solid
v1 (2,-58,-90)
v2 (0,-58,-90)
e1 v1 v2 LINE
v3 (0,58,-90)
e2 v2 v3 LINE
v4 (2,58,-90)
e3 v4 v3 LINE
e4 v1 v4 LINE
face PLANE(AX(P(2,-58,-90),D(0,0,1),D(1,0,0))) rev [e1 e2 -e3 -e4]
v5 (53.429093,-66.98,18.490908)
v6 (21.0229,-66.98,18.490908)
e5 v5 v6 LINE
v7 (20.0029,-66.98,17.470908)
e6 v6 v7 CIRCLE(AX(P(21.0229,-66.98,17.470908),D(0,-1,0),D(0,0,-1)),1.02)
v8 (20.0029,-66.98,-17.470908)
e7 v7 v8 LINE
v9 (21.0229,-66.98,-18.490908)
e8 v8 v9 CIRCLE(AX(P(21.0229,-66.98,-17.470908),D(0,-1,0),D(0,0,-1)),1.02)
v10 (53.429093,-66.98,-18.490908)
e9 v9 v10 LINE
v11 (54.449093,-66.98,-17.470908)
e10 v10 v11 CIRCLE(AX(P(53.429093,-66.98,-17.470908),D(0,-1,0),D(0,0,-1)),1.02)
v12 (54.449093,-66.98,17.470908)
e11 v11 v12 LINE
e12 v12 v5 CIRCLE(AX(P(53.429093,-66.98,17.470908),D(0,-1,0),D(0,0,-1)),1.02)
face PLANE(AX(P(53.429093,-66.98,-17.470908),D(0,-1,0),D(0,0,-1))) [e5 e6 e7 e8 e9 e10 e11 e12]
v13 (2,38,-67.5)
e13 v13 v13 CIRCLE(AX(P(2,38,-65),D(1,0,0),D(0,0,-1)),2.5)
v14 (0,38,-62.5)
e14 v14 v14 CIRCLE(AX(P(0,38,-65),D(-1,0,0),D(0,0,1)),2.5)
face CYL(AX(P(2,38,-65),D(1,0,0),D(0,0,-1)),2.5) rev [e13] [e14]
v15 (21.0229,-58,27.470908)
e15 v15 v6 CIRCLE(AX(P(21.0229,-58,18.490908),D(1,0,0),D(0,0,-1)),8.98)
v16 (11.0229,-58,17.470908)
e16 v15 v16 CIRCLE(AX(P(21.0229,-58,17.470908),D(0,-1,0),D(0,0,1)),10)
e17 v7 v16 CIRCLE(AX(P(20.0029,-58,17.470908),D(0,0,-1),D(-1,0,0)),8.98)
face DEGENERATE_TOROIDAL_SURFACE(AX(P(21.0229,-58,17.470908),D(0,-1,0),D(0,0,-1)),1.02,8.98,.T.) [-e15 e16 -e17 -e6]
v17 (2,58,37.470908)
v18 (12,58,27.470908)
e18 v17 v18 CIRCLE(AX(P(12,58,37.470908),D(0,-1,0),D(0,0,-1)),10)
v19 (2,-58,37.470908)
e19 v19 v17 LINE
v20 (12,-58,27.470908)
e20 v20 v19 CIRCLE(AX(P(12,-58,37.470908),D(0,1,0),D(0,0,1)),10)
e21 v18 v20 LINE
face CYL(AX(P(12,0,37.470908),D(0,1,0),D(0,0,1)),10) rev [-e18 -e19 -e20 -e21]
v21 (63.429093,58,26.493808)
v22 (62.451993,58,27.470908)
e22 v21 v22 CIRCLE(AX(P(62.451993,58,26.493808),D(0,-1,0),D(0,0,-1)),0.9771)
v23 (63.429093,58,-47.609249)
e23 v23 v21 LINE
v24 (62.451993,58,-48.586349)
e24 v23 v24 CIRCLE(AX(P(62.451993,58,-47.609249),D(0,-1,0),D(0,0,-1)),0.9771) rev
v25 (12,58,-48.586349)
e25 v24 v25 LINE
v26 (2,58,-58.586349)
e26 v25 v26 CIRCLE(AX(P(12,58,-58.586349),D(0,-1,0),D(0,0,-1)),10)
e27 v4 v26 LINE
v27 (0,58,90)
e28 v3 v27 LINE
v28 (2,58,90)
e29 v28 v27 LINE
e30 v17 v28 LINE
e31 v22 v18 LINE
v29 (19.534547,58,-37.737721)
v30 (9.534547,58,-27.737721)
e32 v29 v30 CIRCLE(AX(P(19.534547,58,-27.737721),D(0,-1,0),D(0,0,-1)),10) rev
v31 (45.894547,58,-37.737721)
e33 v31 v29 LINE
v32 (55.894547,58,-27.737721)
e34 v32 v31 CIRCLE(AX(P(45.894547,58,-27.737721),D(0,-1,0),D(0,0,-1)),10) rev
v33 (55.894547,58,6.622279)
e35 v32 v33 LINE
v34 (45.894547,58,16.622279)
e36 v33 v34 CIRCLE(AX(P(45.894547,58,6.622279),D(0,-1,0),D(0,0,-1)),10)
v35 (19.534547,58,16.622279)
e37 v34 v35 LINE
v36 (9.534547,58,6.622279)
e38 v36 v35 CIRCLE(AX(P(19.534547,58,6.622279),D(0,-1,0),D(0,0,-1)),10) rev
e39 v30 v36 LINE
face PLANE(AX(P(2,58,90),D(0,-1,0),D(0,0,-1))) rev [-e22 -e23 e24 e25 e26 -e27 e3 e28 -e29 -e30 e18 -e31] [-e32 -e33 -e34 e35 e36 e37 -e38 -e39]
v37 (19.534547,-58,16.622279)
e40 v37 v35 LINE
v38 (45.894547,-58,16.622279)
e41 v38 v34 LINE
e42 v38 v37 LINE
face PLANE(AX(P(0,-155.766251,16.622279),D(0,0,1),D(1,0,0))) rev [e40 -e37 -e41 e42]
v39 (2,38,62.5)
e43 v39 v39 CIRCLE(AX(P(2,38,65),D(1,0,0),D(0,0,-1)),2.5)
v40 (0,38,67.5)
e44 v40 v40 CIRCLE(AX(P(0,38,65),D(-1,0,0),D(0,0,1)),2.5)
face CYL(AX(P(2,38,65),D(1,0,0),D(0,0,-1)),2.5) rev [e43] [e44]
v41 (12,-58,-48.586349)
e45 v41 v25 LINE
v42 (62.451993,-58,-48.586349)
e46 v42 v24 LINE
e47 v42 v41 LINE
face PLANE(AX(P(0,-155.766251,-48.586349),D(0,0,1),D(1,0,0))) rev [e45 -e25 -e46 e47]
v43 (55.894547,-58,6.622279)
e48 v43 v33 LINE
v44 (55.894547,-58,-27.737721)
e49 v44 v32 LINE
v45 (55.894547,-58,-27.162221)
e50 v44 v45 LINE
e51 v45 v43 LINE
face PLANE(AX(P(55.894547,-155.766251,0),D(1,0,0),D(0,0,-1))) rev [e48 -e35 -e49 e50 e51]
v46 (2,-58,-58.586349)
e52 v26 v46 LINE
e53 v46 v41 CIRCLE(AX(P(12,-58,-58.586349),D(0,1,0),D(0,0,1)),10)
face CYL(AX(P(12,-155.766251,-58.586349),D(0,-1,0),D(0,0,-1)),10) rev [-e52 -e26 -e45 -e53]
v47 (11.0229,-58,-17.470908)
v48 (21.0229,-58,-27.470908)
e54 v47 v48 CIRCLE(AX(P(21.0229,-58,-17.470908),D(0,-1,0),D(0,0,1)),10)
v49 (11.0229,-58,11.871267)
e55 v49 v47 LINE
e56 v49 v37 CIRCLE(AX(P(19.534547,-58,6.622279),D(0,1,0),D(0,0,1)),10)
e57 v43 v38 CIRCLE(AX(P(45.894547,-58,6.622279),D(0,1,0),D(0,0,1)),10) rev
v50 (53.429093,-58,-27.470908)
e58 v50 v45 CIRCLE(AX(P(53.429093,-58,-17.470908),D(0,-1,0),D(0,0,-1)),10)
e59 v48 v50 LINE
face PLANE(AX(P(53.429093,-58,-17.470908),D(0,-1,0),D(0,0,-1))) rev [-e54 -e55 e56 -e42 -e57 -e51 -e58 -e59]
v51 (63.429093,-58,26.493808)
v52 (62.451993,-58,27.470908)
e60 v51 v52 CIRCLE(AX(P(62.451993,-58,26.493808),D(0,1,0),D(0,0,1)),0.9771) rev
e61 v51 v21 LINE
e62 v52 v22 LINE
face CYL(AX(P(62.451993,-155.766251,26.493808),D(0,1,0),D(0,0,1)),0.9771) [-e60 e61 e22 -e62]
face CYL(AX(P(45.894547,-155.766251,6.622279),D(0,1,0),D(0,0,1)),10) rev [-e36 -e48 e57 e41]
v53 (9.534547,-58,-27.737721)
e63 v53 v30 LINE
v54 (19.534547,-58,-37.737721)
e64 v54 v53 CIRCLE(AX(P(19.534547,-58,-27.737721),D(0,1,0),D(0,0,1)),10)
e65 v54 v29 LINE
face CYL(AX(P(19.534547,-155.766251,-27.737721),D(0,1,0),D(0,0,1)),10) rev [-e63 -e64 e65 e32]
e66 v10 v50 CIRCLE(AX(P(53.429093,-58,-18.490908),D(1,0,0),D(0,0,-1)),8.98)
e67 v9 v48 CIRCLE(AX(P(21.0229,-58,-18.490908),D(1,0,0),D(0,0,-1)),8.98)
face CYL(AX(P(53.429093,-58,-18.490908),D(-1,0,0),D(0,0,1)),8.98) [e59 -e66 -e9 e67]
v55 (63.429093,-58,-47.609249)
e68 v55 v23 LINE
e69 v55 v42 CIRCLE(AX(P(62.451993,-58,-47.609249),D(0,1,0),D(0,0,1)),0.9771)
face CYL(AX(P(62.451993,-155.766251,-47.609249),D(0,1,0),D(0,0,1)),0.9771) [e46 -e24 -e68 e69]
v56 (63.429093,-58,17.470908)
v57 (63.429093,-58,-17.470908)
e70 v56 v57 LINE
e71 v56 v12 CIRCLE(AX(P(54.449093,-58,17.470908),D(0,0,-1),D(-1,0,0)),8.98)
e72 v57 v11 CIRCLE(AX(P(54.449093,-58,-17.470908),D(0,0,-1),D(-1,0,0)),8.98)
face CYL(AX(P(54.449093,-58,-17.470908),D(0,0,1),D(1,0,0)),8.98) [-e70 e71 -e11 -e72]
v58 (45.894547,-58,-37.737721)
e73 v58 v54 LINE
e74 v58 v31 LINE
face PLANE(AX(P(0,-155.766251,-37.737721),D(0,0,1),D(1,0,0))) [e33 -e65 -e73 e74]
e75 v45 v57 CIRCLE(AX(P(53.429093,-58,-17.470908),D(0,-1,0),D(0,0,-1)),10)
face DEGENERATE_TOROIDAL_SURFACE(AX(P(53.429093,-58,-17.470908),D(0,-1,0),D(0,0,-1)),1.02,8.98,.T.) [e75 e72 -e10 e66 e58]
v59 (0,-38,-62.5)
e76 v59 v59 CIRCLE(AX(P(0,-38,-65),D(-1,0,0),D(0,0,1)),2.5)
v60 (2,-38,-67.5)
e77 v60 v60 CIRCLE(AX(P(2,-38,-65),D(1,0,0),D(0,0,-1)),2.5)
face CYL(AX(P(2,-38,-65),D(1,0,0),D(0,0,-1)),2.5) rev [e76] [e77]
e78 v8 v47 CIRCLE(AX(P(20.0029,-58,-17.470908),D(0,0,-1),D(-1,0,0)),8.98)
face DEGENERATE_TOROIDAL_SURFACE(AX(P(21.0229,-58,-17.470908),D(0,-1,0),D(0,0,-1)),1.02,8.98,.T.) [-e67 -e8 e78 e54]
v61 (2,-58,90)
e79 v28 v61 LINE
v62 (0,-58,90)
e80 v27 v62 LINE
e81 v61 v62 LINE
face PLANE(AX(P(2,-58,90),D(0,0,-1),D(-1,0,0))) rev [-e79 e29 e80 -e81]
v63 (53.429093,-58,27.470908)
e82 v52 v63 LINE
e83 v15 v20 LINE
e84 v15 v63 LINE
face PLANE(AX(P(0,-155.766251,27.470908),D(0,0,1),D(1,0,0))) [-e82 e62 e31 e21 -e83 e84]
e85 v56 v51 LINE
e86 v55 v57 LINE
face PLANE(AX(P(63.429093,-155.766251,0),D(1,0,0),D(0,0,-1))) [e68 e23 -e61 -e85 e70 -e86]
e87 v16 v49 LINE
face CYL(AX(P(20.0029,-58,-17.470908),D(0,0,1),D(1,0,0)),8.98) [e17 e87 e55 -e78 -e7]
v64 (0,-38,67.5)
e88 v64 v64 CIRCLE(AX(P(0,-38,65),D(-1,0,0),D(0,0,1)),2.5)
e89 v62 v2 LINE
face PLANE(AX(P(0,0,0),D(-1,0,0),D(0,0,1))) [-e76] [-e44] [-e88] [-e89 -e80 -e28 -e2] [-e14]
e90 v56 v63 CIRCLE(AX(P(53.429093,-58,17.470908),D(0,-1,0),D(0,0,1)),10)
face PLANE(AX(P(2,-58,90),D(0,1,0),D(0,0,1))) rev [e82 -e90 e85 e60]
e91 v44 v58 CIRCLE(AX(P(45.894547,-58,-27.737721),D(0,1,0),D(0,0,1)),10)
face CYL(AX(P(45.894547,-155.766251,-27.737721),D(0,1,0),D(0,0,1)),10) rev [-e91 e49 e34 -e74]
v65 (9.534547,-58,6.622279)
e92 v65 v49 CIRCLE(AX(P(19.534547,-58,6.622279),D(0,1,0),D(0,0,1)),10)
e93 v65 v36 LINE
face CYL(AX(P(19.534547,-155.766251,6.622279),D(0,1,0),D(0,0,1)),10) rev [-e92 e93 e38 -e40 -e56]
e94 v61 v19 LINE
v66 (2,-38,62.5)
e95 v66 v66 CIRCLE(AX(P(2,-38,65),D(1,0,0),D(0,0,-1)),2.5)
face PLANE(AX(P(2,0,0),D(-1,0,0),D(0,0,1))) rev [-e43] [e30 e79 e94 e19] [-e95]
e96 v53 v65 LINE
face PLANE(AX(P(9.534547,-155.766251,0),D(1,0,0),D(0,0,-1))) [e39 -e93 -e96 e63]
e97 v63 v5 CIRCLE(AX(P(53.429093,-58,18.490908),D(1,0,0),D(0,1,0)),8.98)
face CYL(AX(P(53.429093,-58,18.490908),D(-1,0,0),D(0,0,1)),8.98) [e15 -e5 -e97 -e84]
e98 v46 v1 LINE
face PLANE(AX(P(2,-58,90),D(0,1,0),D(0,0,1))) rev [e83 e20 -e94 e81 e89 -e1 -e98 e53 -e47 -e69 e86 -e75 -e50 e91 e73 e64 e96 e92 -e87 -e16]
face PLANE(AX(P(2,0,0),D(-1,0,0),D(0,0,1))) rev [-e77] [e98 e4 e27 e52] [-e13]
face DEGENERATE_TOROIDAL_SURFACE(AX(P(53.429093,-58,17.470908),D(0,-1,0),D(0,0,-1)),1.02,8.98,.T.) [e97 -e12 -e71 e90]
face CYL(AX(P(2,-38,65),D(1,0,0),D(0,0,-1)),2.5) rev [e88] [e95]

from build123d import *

# Parameters (mm, degrees)
SKETCH1_W                       = 180
SKETCH1_H                       = 116
BOSS_EXTRUDE1_DEPTH             = 2
BOSS_EXTRUDE6_REACH             = 109.089
BOSS_EXTRUDE6_DIRECTION_2_REACH = 109.089
FILLET5_R                       = 10
BOSS_EXTRUDE8_DEPTH             = 8.98
FILLET7_R                       = 8.98
M6X1_0_TAPPED_HOLE1_D           = 5


with BuildPart() as part:
    # Sketch1 → Boss-Extrude1 (new body)
    with BuildSketch(Plane(origin=(0, 0, 0), x_dir=(0, 0, -1), z_dir=(1, 0, 0))):
        Rectangle(SKETCH1_W, SKETCH1_H)
    extrude(amount=BOSS_EXTRUDE1_DEPTH)

    # Boss-Extrude6: up to this face of the body (flat: up to its plane)
    boss_extrude6_end = Plane(part.part.faces().sort_by_distance((1, -58, 0))[0])
    # Sketch9 → Boss-Extrude6 (add, up to the picked face)
    with BuildSketch(Plane(origin=(0, 0, 0), x_dir=(1, 0, 0), z_dir=(0, 1, 0)), mode=Mode.PRIVATE) as boss_extrude6_sk1:
        with BuildLine():
            Line((2, -27.470907931), (20, -27.470907931))
            Line((20, -27.470907931), (62.451993428, -27.470907931))
            ThreePointArc((62.451993428, -27.470907931), (63.142907445, -27.184721975), (63.429093401, -26.493807958))
            Line((63.429093401, -26.493807958), (63.429093401, 47.609249241))
            ThreePointArc((63.429093401, 47.609249241), (63.142907445, 48.300163258), (62.451993428, 48.586349214))
            Line((62.451993428, 48.586349214), (20, 48.586349214))
            Line((20, 48.586349214), (2, 48.586349214))
            Line((2, 48.586349214), (2, 27.673016612))
            Line((2, 27.673016612), (2, -27.470907931))
        make_face()
        with BuildLine():
            Line((45.894546701, -16.622279359), (19.534546701, -16.622279359))
            ThreePointArc((19.534546701, -16.622279359), (12.463478889, -13.693347171), (9.534546701, -6.622279359))
            Line((9.534546701, -6.622279359), (9.534546701, 27.737720641))
            ThreePointArc((9.534546701, 27.737720641), (12.463478889, 34.808788453), (19.534546701, 37.737720641))
            Line((19.534546701, 37.737720641), (45.894546701, 37.737720641))
            ThreePointArc((45.894546701, 37.737720641), (52.965614513, 34.808788453), (55.894546701, 27.737720641))
            Line((55.894546701, 27.737720641), (55.894546701, -6.622279359))
            ThreePointArc((55.894546701, -6.622279359), (52.965614513, -13.693347171), (45.894546701, -16.622279359))
        make_face(mode=Mode.SUBTRACT)
    boss_extrude6_tool1 = split(extrude(boss_extrude6_sk1.sketch, amount=-BOSS_EXTRUDE6_REACH, mode=Mode.PRIVATE), bisect_by=boss_extrude6_end, keep=Keep.BOTH, mode=Mode.PRIVATE)
    add(boss_extrude6_tool1.solids().sort_by(Axis((11, 0, 26.493245), (0, -1, 0)))[0])

    # Boss-Extrude6 direction 2: up to this face of the body (flat: up to its plane)
    boss_extrude6_direction_2_end = Plane(part.part.faces().sort_by_distance((1, 58, 0))[0])
    # Sketch9 → Boss-Extrude6 direction 2 (add, up to the picked face)
    with BuildSketch(Plane(origin=(0, 0, 0), x_dir=(1, 0, 0), z_dir=(0, 1, 0)), mode=Mode.PRIVATE) as boss_extrude6_direction_2_sk1:
        with BuildLine():
            Line((2, -27.470907931), (20, -27.470907931))
            Line((20, -27.470907931), (62.451993428, -27.470907931))
            ThreePointArc((62.451993428, -27.470907931), (63.142907445, -27.184721975), (63.429093401, -26.493807958))
            Line((63.429093401, -26.493807958), (63.429093401, 47.609249241))
            ThreePointArc((63.429093401, 47.609249241), (63.142907445, 48.300163258), (62.451993428, 48.586349214))
            Line((62.451993428, 48.586349214), (20, 48.586349214))
            Line((20, 48.586349214), (2, 48.586349214))
            Line((2, 48.586349214), (2, 27.673016612))
            Line((2, 27.673016612), (2, -27.470907931))
        make_face()
        with BuildLine():
            Line((45.894546701, -16.622279359), (19.534546701, -16.622279359))
            ThreePointArc((19.534546701, -16.622279359), (12.463478889, -13.693347171), (9.534546701, -6.622279359))
            Line((9.534546701, -6.622279359), (9.534546701, 27.737720641))
            ThreePointArc((9.534546701, 27.737720641), (12.463478889, 34.808788453), (19.534546701, 37.737720641))
            Line((19.534546701, 37.737720641), (45.894546701, 37.737720641))
            ThreePointArc((45.894546701, 37.737720641), (52.965614513, 34.808788453), (55.894546701, 27.737720641))
            Line((55.894546701, 27.737720641), (55.894546701, -6.622279359))
            ThreePointArc((55.894546701, -6.622279359), (52.965614513, -13.693347171), (45.894546701, -16.622279359))
        make_face(mode=Mode.SUBTRACT)
    boss_extrude6_direction_2_tool1 = split(extrude(boss_extrude6_direction_2_sk1.sketch, amount=BOSS_EXTRUDE6_DIRECTION_2_REACH, mode=Mode.PRIVATE), bisect_by=boss_extrude6_direction_2_end, keep=Keep.BOTH, mode=Mode.PRIVATE)
    add(boss_extrude6_direction_2_tool1.solids().sort_by(Axis((11, 0, 26.493245), (0, 1, 0)))[0])

    # Fillet5
    fillet5_edges = [part.edges().sort_by_distance(p)[0] for p in [
        (2, 0, 27.470907931),
        (2, 0, -48.586349214),
    ]]
    fillet(fillet5_edges, radius=FILLET5_R)

    # Sketch11 → Boss-Extrude8 (add)
    with BuildSketch(Plane.XZ.offset(58)):
        with BuildLine():
            Line((21.022900027, -27.470907931), (53.429093401, -27.470907931))
            ThreePointArc((53.429093401, -27.470907931), (60.500161213, -24.541975743), (63.429093401, -17.470907931))
            Line((63.429093401, -17.470907931), (63.429093401, 17.470907931))
            ThreePointArc((63.429093401, 17.470907931), (60.500161213, 24.541975743), (53.429093401, 27.470907931))
            Line((53.429093401, 27.470907931), (21.022900027, 27.470907931))
            ThreePointArc((21.022900027, 27.470907931), (13.951832215, 24.541975743), (11.022900027, 17.470907931))
            Line((11.022900027, 17.470907931), (11.022900027, -17.470907931))
            ThreePointArc((11.022900027, -17.470907931), (13.951832215, -24.541975743), (21.022900027, -27.470907931))
        make_face()
    extrude(amount=BOSS_EXTRUDE8_DEPTH)

    # Fillet7
    fillet7_edges = [part.edges().sort_by_distance(p)[0] for p in [
        (60.500161213, -66.98, -24.541975743),
        (37.225996714, -66.98, -27.470907931),
        (13.951832215, -66.98, -24.541975743),
        (11.022900027, -66.98, 0),
        (13.951832215, -66.98, 24.541975743),
        (63.429093401, -66.98, 0),
        (60.500161213, -66.98, 24.541975743),
        (37.225996714, -66.98, 27.470907931),
    ]]
    fillet(fillet7_edges, radius=FILLET7_R - 0.0001)  # a hair under: the kernel refuses the full size

    # M6x1.0 Tapped Hole1 (through all)
    with Locations(Plane(origin=(2, 0, 0), x_dir=(0, 0, -1), z_dir=(1, 0, 0))):
        with Locations((-65, 38), (-65, -38), (65, -38), (65, 38)):
            Hole(M6X1_0_TAPPED_HOLE1_D / 2)


solid = part.part
